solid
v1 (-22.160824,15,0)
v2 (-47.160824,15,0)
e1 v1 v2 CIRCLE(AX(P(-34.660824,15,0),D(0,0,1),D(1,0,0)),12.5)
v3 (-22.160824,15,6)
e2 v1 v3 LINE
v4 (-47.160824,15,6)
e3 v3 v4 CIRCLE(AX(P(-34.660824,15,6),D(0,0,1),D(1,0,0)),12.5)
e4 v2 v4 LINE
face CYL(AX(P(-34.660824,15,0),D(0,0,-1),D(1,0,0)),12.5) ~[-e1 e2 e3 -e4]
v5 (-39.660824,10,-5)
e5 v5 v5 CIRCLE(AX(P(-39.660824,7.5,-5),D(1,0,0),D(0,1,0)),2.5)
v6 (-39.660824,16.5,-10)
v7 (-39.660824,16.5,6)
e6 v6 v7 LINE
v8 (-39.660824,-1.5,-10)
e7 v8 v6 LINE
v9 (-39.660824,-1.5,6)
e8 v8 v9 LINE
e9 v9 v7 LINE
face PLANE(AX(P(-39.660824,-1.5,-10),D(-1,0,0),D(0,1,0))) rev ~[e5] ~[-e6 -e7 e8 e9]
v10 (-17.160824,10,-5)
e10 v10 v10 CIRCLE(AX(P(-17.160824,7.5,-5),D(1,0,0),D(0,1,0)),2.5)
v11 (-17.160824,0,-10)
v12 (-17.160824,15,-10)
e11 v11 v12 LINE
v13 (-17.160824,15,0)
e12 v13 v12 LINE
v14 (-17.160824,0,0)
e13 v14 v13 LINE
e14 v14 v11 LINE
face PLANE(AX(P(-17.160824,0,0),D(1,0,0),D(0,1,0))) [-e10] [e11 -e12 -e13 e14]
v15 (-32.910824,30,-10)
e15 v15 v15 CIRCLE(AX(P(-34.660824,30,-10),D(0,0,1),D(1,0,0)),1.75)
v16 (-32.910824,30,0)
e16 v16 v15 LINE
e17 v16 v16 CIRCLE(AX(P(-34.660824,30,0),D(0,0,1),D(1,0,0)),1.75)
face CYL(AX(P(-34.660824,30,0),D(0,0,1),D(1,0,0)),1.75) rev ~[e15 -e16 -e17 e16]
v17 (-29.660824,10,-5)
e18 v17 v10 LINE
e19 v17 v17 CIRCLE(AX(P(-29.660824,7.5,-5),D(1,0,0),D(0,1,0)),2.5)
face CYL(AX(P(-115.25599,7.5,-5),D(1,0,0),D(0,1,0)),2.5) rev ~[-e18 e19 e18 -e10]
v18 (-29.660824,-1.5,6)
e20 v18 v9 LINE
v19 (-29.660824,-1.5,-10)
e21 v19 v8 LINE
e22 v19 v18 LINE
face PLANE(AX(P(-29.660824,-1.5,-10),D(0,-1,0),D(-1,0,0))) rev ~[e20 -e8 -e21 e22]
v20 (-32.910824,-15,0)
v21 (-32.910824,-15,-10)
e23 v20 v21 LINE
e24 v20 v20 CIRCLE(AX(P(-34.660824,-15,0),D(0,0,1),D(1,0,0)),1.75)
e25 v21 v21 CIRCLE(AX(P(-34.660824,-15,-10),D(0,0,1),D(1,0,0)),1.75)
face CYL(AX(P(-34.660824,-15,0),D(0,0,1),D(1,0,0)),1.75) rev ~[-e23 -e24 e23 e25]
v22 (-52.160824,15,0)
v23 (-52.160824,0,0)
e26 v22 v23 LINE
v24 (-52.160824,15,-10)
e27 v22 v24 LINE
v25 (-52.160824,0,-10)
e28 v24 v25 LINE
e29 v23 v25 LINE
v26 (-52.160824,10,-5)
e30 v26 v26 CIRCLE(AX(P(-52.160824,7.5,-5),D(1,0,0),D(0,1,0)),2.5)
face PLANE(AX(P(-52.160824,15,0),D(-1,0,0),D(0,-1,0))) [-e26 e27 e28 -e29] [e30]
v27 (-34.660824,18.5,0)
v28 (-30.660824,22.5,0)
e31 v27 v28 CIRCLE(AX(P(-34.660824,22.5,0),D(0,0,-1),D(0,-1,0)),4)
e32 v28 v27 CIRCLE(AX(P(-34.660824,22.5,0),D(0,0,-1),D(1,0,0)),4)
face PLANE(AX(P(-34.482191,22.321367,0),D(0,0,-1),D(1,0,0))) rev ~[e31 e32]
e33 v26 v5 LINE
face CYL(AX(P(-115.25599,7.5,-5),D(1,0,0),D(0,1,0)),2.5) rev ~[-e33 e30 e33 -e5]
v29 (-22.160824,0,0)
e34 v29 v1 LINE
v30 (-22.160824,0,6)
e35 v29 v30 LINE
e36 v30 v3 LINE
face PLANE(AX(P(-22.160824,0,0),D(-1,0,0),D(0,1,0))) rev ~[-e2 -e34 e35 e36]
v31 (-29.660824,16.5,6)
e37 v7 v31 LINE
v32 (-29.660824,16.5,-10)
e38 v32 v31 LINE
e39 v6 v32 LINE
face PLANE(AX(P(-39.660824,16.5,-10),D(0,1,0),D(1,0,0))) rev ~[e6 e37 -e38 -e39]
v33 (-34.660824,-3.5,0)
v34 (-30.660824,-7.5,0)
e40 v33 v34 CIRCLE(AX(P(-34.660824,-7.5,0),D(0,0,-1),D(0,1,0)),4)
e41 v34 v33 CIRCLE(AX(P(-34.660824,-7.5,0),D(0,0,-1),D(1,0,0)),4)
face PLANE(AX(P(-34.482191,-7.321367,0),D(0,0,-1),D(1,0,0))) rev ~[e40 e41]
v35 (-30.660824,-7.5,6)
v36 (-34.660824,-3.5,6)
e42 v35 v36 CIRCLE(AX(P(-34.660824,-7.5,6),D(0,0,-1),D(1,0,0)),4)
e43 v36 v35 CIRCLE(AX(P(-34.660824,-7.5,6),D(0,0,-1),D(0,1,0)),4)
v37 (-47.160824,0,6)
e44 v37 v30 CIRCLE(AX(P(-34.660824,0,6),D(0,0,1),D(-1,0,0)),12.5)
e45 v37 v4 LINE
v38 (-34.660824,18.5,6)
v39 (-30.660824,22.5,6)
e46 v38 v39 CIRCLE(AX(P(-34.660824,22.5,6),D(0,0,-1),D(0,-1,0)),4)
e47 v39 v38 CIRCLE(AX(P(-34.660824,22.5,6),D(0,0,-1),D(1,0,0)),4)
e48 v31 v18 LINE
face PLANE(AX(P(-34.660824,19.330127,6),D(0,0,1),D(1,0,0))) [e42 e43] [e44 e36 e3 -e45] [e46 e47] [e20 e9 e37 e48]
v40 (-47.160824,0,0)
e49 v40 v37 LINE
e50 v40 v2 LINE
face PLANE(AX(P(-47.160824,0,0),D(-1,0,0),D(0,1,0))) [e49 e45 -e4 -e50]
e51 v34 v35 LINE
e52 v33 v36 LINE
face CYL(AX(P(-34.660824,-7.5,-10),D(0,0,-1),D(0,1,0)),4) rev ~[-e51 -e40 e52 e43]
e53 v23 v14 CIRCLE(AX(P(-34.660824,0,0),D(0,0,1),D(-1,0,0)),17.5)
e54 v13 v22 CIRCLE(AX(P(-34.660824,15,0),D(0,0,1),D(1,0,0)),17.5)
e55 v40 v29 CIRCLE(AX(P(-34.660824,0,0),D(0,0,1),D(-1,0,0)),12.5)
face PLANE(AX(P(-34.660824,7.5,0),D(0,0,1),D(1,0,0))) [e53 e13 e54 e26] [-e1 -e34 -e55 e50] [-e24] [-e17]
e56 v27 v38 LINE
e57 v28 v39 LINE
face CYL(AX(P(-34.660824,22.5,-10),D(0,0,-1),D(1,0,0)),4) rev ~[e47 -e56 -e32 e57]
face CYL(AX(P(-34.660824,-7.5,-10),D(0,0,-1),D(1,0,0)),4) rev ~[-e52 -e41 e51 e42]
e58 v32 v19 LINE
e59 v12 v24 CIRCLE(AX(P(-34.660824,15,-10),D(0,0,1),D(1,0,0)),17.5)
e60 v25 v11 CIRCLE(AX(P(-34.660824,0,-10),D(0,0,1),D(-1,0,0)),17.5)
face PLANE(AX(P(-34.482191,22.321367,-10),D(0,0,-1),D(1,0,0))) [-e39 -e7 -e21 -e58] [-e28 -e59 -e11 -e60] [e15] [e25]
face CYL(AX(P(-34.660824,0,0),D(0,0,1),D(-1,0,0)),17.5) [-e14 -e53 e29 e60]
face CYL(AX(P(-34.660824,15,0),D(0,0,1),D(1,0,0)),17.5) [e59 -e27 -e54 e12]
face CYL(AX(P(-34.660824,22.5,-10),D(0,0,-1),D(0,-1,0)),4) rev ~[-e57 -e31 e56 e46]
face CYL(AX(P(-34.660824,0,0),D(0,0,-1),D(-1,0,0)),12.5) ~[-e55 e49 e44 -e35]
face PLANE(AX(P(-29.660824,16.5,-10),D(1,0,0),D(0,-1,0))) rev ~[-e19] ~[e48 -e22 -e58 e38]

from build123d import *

# Parameters (mm, degrees)
F0_W      = 25
F0_H      = 15
F1_DEPTH  = 6
F3_DEPTH  = 10
F5_D      = 5
F6_W      = 10
F6_H      = 15
F7_DEPTH  = 16
F8_DEPTH  = 25.4
F9_DEPTH  = 10
F10_R     = 1.75
F11_DEPTH = 10


with BuildPart() as f1:
    # F0 (on Top) → F1 (new body)
    with BuildSketch(Plane.XY):
        with BuildLine():
            ThreePointArc((-22.1608236432, 15), (-34.6608236432, 27.5), (-47.1608236432, 15))
            Line((-47.1608236432, 15), (-22.1608236432, 15))
        make_face()
        with Locations((-34.6608236432, 7.5)):
            Rectangle(F0_W, F0_H)
        with BuildLine():
            Line((-22.1608236432, 0), (-47.1608236432, 0))
            ThreePointArc((-47.1608236432, 0), (-34.6608236432, -12.5), (-22.1608236432, 0))
        make_face()
    extrude(amount=F1_DEPTH)

    # F2 (on Top) → F3 (join)
    with BuildSketch(Plane.XY):
        with BuildLine():
            Line((-17.1608236432, 0), (-17.1608236432, 15))
            ThreePointArc((-17.1608236432, 15), (-34.6608236432, 32.5), (-52.1608236432, 15))
            Line((-52.1608236432, 15), (-52.1608236432, 0))
            ThreePointArc((-52.1608236432, 0), (-34.6608236432, -17.5), (-17.1608236432, 0))
        make_face()
    extrude(amount=-F3_DEPTH)

    # F5 (through all)
    with Locations(Plane(origin=(-52.1608236432, 0, 0), x_dir=(0, -1, 0), z_dir=(-1, 0, 0))):
        with Locations((-7.5, -5)):
            Hole(F5_D / 2)

    # F6 (on face) → F7 (cut, through all)
    with BuildSketch(Plane(origin=(0, 0, -10), x_dir=(1, 0, 0), z_dir=(0, 0, -1))):
        Polygon((-39.6608236432, 1.5), (-39.6608236432, 0), (-29.6608236432, 0), (-29.6608236432, 1.5), (-34.6608236432, 1.5), align=None)
        with Locations((-34.6608236432, -7.5)):
            Rectangle(F6_W, F6_H)
        Polygon((-29.6608236432, -15), (-39.6608236432, -15), (-39.6608236432, -16.5), (-34.6608236432, -16.5), (-29.6608236432, -16.5), align=None)
    extrude(amount=-F7_DEPTH, mode=Mode.SUBTRACT)

    # F6 (on face) → F8 (cut)
    with BuildSketch(Plane(origin=(0, 0, -10), x_dir=(1, 0, 0), z_dir=(0, 0, -1))):
        with BuildLine():
            ThreePointArc((-30.6608236432, -22.5), (-31.8323965185, -19.6715728753), (-34.6608236432, -18.5))
            ThreePointArc((-34.6608236432, -18.5), (-37.489250768, -25.3284271247), (-30.6608236432, -22.5))
        make_face()
        with BuildLine():
            ThreePointArc((-30.6608236432, 7.5), (-37.489250768, 10.3284271247), (-34.6608236432, 3.5))
            ThreePointArc((-34.6608236432, 3.5), (-31.8323965185, 4.6715728753), (-30.6608236432, 7.5))
        make_face()
    extrude(amount=-F8_DEPTH, mode=Mode.SUBTRACT)

    # F6 (on face) → F9 (join)
    with BuildSketch(Plane(origin=(0, 0, -10), x_dir=(1, 0, 0), z_dir=(0, 0, -1))):
        with BuildLine():
            ThreePointArc((-30.6608236432, -22.5), (-31.8323965185, -19.6715728753), (-34.6608236432, -18.5))
            ThreePointArc((-34.6608236432, -18.5), (-37.489250768, -25.3284271247), (-30.6608236432, -22.5))
        make_face()
        with BuildLine():
            ThreePointArc((-30.6608236432, 7.5), (-37.489250768, 10.3284271247), (-34.6608236432, 3.5))
            ThreePointArc((-34.6608236432, 3.5), (-31.8323965185, 4.6715728753), (-30.6608236432, 7.5))
        make_face()
    extrude(amount=-F9_DEPTH)

    # F10 (on face) → F11 (cut)
    with BuildSketch(Plane.XY):
        with Locations((-34.6608236432, 30)):
            Circle(F10_R)
        with Locations((-34.6608236432, -15)):
            Circle(F10_R)
    extrude(amount=-F11_DEPTH, mode=Mode.SUBTRACT)


solid = f1.part
